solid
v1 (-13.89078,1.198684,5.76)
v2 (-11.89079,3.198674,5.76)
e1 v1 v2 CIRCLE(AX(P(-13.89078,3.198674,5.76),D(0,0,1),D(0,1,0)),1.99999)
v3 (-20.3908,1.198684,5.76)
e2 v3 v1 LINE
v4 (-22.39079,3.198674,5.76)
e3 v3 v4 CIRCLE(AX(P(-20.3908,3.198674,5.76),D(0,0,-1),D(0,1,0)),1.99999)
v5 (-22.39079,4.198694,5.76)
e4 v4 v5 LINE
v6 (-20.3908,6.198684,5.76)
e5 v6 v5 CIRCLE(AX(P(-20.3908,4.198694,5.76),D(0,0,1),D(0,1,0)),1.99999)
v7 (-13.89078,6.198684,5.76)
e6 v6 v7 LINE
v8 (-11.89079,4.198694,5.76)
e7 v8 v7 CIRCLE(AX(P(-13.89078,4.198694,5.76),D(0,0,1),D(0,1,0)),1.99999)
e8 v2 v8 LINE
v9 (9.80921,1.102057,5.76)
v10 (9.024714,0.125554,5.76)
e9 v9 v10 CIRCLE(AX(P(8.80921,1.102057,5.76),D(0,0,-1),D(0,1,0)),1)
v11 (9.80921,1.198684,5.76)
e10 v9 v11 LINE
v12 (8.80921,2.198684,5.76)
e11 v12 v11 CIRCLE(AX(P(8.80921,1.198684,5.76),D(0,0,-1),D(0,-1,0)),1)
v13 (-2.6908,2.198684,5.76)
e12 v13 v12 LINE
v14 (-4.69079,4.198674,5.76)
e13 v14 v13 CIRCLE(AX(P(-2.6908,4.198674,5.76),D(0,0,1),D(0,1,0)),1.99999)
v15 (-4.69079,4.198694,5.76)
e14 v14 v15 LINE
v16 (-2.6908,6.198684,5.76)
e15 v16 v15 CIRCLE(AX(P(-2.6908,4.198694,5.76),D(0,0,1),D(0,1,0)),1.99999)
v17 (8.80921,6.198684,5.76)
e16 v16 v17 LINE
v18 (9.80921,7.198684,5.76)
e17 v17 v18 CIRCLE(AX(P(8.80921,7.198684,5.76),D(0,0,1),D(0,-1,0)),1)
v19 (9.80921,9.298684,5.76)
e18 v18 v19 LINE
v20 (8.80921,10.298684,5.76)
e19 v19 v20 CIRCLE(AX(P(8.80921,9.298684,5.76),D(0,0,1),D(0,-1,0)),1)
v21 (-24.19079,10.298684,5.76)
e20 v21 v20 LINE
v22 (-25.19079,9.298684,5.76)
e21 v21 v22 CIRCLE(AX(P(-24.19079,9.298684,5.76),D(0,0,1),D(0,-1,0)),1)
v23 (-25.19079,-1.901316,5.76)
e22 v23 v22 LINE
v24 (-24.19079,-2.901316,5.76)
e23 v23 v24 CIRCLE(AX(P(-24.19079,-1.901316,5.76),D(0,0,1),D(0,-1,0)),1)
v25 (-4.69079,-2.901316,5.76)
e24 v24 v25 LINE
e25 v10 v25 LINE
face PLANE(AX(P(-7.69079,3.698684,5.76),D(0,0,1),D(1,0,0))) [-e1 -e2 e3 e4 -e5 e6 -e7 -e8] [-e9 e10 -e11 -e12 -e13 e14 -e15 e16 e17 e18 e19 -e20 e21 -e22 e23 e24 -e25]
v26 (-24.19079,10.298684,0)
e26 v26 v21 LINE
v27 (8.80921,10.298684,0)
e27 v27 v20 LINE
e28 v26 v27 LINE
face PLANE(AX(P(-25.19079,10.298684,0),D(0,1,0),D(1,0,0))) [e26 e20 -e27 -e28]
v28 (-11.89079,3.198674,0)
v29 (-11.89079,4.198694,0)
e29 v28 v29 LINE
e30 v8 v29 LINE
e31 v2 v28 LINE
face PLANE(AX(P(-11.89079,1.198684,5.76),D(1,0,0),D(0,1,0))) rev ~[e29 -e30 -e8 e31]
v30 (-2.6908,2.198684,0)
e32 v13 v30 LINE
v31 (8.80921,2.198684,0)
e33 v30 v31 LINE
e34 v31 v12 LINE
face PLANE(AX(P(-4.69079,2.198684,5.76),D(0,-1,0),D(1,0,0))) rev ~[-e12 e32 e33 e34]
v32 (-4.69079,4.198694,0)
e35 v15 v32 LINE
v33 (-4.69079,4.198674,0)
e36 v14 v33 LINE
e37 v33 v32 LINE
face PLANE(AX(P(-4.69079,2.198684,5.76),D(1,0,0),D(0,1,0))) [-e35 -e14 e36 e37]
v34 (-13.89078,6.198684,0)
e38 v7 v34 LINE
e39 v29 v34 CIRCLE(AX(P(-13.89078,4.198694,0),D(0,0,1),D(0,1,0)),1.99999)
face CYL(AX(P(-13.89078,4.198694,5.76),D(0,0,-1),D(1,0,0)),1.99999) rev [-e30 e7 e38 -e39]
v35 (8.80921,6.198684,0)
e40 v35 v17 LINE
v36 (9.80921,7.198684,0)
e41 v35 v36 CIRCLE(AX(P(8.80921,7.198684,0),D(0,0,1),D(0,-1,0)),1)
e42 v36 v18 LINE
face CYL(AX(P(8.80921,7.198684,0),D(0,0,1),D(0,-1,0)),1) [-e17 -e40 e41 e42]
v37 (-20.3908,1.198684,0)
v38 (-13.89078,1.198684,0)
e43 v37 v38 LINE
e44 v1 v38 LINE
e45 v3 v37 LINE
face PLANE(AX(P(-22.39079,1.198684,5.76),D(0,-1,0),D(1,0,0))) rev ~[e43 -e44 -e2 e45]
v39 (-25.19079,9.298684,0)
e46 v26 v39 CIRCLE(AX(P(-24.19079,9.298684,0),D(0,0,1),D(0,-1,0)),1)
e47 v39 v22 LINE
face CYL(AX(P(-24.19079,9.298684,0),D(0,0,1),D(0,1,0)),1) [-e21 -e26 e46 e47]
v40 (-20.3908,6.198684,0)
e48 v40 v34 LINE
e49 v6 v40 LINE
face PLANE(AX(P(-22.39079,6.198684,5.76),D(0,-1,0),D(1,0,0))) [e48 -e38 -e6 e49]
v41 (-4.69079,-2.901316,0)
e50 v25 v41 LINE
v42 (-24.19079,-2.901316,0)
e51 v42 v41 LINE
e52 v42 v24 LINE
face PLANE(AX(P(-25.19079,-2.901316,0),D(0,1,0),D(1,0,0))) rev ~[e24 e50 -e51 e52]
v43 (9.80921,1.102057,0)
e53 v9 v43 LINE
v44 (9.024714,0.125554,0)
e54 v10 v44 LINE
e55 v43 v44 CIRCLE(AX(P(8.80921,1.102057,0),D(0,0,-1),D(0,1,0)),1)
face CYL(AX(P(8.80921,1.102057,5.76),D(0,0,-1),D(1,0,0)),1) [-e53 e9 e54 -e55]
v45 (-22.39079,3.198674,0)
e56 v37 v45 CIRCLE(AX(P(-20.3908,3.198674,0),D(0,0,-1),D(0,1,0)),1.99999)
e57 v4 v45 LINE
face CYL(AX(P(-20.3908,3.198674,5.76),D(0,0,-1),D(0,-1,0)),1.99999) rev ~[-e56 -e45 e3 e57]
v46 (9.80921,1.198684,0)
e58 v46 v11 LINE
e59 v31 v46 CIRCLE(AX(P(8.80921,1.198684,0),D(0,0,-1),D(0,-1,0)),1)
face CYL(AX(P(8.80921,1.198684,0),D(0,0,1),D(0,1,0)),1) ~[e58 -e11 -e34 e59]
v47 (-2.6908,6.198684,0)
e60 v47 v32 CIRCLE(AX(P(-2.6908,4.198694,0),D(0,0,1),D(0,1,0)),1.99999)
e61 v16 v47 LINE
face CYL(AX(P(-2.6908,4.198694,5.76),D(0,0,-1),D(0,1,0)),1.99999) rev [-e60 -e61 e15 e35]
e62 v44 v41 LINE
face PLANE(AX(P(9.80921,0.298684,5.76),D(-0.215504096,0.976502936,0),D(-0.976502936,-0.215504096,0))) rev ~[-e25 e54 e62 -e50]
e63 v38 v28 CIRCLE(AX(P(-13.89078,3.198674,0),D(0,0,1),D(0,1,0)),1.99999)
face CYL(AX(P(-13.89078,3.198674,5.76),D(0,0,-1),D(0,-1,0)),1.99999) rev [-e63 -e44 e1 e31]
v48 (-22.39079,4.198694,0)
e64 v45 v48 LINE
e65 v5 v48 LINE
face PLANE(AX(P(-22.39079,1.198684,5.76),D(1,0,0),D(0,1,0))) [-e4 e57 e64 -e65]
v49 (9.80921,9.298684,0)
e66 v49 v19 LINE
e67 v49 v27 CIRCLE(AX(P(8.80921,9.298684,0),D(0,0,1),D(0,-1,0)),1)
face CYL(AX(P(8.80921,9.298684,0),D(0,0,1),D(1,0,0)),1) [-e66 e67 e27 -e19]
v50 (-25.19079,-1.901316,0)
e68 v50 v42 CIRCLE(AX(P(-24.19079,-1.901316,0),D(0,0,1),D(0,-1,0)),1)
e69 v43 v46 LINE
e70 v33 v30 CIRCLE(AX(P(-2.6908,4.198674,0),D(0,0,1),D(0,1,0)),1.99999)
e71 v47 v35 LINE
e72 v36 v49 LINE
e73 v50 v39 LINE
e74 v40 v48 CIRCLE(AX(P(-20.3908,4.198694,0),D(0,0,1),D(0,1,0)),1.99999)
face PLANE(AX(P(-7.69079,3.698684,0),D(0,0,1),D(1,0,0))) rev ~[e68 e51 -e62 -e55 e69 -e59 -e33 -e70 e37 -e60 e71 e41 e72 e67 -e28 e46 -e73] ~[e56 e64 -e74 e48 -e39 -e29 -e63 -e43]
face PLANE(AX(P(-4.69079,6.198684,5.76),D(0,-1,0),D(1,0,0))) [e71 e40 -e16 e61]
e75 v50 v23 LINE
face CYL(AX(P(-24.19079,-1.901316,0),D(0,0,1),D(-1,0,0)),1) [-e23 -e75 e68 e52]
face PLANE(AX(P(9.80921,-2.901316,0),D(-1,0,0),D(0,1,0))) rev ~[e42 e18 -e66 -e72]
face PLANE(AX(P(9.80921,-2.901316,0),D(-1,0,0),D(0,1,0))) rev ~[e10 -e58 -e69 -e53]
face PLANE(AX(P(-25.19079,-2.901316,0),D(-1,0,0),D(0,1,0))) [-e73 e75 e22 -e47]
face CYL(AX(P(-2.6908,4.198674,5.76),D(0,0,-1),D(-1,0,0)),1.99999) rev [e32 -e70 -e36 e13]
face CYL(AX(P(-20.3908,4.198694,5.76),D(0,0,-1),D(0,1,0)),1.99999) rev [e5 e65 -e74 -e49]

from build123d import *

# Parameters (mm, degrees)
F0_W     = 35
F0_H     = 13.2
F1_DEPTH = 5.76
F2_W     = 10.5
F2_H     = 5
F2_W_2   = 15
F2_H_2   = 4
F3_DEPTH = 25
F4_R     = 1.99999
F5_R     = 1


# Not quite as in the source:
# - a fillet or chamfer is up to 0.001 mm smaller than in the source, because OpenCascade refuses the exact size


with BuildPart() as f1:
    # F0 (on Top) → F1 (new body)
    with BuildSketch(Plane.XY):
        with Locations((-7.6907900348, 3.6986840781)):
            Rectangle(F0_W, F0_H)
    extrude(amount=F1_DEPTH)

    # F2 (on face) → F3 (cut)
    with BuildSketch(Plane.XY.offset(5.76)):
        Polygon((-4.6907900348, -2.9013159219), (9.8092099652, -2.9013159219), (9.8092099652, 0.2986840781), align=None)
        with Locations((-17.1407900348, 3.6986840781)):
            Rectangle(F2_W, F2_H)
        with Locations((2.8092099652, 4.1986840781)):
            Rectangle(F2_W_2, F2_H_2)
    extrude(amount=-F3_DEPTH, mode=Mode.SUBTRACT)

    # F4 (radius 2 in the source; OpenCascade refuses exactly that, so slightly less here)
    f4_edges = [f1.edges().sort_by_distance(p)[0] for p in [
        (-22.39079, 6.198684, 2.88),
        (-11.89079, 6.198684, 2.88),
        (-11.89079, 1.198684, 2.88),
        (-22.39079, 1.198684, 2.88),
        (-4.69079, 2.198684, 2.88),
        (-4.69079, 6.198684, 2.88),
    ]]
    fillet(f4_edges, radius=F4_R)

    # F5
    f5_edges = [f1.edges().sort_by_distance(p)[0] for p in [
        (9.80921, 10.298684, 2.88),
        (9.80921, 6.198684, 2.88),
        (9.80921, 2.198684, 2.88),
        (9.80921, 0.298684, 2.88),
        (-25.19079, -2.901316, 2.88),
        (-25.19079, 10.298684, 2.88),
    ]]
    fillet(f5_edges, radius=F5_R)


solid = f1.part
